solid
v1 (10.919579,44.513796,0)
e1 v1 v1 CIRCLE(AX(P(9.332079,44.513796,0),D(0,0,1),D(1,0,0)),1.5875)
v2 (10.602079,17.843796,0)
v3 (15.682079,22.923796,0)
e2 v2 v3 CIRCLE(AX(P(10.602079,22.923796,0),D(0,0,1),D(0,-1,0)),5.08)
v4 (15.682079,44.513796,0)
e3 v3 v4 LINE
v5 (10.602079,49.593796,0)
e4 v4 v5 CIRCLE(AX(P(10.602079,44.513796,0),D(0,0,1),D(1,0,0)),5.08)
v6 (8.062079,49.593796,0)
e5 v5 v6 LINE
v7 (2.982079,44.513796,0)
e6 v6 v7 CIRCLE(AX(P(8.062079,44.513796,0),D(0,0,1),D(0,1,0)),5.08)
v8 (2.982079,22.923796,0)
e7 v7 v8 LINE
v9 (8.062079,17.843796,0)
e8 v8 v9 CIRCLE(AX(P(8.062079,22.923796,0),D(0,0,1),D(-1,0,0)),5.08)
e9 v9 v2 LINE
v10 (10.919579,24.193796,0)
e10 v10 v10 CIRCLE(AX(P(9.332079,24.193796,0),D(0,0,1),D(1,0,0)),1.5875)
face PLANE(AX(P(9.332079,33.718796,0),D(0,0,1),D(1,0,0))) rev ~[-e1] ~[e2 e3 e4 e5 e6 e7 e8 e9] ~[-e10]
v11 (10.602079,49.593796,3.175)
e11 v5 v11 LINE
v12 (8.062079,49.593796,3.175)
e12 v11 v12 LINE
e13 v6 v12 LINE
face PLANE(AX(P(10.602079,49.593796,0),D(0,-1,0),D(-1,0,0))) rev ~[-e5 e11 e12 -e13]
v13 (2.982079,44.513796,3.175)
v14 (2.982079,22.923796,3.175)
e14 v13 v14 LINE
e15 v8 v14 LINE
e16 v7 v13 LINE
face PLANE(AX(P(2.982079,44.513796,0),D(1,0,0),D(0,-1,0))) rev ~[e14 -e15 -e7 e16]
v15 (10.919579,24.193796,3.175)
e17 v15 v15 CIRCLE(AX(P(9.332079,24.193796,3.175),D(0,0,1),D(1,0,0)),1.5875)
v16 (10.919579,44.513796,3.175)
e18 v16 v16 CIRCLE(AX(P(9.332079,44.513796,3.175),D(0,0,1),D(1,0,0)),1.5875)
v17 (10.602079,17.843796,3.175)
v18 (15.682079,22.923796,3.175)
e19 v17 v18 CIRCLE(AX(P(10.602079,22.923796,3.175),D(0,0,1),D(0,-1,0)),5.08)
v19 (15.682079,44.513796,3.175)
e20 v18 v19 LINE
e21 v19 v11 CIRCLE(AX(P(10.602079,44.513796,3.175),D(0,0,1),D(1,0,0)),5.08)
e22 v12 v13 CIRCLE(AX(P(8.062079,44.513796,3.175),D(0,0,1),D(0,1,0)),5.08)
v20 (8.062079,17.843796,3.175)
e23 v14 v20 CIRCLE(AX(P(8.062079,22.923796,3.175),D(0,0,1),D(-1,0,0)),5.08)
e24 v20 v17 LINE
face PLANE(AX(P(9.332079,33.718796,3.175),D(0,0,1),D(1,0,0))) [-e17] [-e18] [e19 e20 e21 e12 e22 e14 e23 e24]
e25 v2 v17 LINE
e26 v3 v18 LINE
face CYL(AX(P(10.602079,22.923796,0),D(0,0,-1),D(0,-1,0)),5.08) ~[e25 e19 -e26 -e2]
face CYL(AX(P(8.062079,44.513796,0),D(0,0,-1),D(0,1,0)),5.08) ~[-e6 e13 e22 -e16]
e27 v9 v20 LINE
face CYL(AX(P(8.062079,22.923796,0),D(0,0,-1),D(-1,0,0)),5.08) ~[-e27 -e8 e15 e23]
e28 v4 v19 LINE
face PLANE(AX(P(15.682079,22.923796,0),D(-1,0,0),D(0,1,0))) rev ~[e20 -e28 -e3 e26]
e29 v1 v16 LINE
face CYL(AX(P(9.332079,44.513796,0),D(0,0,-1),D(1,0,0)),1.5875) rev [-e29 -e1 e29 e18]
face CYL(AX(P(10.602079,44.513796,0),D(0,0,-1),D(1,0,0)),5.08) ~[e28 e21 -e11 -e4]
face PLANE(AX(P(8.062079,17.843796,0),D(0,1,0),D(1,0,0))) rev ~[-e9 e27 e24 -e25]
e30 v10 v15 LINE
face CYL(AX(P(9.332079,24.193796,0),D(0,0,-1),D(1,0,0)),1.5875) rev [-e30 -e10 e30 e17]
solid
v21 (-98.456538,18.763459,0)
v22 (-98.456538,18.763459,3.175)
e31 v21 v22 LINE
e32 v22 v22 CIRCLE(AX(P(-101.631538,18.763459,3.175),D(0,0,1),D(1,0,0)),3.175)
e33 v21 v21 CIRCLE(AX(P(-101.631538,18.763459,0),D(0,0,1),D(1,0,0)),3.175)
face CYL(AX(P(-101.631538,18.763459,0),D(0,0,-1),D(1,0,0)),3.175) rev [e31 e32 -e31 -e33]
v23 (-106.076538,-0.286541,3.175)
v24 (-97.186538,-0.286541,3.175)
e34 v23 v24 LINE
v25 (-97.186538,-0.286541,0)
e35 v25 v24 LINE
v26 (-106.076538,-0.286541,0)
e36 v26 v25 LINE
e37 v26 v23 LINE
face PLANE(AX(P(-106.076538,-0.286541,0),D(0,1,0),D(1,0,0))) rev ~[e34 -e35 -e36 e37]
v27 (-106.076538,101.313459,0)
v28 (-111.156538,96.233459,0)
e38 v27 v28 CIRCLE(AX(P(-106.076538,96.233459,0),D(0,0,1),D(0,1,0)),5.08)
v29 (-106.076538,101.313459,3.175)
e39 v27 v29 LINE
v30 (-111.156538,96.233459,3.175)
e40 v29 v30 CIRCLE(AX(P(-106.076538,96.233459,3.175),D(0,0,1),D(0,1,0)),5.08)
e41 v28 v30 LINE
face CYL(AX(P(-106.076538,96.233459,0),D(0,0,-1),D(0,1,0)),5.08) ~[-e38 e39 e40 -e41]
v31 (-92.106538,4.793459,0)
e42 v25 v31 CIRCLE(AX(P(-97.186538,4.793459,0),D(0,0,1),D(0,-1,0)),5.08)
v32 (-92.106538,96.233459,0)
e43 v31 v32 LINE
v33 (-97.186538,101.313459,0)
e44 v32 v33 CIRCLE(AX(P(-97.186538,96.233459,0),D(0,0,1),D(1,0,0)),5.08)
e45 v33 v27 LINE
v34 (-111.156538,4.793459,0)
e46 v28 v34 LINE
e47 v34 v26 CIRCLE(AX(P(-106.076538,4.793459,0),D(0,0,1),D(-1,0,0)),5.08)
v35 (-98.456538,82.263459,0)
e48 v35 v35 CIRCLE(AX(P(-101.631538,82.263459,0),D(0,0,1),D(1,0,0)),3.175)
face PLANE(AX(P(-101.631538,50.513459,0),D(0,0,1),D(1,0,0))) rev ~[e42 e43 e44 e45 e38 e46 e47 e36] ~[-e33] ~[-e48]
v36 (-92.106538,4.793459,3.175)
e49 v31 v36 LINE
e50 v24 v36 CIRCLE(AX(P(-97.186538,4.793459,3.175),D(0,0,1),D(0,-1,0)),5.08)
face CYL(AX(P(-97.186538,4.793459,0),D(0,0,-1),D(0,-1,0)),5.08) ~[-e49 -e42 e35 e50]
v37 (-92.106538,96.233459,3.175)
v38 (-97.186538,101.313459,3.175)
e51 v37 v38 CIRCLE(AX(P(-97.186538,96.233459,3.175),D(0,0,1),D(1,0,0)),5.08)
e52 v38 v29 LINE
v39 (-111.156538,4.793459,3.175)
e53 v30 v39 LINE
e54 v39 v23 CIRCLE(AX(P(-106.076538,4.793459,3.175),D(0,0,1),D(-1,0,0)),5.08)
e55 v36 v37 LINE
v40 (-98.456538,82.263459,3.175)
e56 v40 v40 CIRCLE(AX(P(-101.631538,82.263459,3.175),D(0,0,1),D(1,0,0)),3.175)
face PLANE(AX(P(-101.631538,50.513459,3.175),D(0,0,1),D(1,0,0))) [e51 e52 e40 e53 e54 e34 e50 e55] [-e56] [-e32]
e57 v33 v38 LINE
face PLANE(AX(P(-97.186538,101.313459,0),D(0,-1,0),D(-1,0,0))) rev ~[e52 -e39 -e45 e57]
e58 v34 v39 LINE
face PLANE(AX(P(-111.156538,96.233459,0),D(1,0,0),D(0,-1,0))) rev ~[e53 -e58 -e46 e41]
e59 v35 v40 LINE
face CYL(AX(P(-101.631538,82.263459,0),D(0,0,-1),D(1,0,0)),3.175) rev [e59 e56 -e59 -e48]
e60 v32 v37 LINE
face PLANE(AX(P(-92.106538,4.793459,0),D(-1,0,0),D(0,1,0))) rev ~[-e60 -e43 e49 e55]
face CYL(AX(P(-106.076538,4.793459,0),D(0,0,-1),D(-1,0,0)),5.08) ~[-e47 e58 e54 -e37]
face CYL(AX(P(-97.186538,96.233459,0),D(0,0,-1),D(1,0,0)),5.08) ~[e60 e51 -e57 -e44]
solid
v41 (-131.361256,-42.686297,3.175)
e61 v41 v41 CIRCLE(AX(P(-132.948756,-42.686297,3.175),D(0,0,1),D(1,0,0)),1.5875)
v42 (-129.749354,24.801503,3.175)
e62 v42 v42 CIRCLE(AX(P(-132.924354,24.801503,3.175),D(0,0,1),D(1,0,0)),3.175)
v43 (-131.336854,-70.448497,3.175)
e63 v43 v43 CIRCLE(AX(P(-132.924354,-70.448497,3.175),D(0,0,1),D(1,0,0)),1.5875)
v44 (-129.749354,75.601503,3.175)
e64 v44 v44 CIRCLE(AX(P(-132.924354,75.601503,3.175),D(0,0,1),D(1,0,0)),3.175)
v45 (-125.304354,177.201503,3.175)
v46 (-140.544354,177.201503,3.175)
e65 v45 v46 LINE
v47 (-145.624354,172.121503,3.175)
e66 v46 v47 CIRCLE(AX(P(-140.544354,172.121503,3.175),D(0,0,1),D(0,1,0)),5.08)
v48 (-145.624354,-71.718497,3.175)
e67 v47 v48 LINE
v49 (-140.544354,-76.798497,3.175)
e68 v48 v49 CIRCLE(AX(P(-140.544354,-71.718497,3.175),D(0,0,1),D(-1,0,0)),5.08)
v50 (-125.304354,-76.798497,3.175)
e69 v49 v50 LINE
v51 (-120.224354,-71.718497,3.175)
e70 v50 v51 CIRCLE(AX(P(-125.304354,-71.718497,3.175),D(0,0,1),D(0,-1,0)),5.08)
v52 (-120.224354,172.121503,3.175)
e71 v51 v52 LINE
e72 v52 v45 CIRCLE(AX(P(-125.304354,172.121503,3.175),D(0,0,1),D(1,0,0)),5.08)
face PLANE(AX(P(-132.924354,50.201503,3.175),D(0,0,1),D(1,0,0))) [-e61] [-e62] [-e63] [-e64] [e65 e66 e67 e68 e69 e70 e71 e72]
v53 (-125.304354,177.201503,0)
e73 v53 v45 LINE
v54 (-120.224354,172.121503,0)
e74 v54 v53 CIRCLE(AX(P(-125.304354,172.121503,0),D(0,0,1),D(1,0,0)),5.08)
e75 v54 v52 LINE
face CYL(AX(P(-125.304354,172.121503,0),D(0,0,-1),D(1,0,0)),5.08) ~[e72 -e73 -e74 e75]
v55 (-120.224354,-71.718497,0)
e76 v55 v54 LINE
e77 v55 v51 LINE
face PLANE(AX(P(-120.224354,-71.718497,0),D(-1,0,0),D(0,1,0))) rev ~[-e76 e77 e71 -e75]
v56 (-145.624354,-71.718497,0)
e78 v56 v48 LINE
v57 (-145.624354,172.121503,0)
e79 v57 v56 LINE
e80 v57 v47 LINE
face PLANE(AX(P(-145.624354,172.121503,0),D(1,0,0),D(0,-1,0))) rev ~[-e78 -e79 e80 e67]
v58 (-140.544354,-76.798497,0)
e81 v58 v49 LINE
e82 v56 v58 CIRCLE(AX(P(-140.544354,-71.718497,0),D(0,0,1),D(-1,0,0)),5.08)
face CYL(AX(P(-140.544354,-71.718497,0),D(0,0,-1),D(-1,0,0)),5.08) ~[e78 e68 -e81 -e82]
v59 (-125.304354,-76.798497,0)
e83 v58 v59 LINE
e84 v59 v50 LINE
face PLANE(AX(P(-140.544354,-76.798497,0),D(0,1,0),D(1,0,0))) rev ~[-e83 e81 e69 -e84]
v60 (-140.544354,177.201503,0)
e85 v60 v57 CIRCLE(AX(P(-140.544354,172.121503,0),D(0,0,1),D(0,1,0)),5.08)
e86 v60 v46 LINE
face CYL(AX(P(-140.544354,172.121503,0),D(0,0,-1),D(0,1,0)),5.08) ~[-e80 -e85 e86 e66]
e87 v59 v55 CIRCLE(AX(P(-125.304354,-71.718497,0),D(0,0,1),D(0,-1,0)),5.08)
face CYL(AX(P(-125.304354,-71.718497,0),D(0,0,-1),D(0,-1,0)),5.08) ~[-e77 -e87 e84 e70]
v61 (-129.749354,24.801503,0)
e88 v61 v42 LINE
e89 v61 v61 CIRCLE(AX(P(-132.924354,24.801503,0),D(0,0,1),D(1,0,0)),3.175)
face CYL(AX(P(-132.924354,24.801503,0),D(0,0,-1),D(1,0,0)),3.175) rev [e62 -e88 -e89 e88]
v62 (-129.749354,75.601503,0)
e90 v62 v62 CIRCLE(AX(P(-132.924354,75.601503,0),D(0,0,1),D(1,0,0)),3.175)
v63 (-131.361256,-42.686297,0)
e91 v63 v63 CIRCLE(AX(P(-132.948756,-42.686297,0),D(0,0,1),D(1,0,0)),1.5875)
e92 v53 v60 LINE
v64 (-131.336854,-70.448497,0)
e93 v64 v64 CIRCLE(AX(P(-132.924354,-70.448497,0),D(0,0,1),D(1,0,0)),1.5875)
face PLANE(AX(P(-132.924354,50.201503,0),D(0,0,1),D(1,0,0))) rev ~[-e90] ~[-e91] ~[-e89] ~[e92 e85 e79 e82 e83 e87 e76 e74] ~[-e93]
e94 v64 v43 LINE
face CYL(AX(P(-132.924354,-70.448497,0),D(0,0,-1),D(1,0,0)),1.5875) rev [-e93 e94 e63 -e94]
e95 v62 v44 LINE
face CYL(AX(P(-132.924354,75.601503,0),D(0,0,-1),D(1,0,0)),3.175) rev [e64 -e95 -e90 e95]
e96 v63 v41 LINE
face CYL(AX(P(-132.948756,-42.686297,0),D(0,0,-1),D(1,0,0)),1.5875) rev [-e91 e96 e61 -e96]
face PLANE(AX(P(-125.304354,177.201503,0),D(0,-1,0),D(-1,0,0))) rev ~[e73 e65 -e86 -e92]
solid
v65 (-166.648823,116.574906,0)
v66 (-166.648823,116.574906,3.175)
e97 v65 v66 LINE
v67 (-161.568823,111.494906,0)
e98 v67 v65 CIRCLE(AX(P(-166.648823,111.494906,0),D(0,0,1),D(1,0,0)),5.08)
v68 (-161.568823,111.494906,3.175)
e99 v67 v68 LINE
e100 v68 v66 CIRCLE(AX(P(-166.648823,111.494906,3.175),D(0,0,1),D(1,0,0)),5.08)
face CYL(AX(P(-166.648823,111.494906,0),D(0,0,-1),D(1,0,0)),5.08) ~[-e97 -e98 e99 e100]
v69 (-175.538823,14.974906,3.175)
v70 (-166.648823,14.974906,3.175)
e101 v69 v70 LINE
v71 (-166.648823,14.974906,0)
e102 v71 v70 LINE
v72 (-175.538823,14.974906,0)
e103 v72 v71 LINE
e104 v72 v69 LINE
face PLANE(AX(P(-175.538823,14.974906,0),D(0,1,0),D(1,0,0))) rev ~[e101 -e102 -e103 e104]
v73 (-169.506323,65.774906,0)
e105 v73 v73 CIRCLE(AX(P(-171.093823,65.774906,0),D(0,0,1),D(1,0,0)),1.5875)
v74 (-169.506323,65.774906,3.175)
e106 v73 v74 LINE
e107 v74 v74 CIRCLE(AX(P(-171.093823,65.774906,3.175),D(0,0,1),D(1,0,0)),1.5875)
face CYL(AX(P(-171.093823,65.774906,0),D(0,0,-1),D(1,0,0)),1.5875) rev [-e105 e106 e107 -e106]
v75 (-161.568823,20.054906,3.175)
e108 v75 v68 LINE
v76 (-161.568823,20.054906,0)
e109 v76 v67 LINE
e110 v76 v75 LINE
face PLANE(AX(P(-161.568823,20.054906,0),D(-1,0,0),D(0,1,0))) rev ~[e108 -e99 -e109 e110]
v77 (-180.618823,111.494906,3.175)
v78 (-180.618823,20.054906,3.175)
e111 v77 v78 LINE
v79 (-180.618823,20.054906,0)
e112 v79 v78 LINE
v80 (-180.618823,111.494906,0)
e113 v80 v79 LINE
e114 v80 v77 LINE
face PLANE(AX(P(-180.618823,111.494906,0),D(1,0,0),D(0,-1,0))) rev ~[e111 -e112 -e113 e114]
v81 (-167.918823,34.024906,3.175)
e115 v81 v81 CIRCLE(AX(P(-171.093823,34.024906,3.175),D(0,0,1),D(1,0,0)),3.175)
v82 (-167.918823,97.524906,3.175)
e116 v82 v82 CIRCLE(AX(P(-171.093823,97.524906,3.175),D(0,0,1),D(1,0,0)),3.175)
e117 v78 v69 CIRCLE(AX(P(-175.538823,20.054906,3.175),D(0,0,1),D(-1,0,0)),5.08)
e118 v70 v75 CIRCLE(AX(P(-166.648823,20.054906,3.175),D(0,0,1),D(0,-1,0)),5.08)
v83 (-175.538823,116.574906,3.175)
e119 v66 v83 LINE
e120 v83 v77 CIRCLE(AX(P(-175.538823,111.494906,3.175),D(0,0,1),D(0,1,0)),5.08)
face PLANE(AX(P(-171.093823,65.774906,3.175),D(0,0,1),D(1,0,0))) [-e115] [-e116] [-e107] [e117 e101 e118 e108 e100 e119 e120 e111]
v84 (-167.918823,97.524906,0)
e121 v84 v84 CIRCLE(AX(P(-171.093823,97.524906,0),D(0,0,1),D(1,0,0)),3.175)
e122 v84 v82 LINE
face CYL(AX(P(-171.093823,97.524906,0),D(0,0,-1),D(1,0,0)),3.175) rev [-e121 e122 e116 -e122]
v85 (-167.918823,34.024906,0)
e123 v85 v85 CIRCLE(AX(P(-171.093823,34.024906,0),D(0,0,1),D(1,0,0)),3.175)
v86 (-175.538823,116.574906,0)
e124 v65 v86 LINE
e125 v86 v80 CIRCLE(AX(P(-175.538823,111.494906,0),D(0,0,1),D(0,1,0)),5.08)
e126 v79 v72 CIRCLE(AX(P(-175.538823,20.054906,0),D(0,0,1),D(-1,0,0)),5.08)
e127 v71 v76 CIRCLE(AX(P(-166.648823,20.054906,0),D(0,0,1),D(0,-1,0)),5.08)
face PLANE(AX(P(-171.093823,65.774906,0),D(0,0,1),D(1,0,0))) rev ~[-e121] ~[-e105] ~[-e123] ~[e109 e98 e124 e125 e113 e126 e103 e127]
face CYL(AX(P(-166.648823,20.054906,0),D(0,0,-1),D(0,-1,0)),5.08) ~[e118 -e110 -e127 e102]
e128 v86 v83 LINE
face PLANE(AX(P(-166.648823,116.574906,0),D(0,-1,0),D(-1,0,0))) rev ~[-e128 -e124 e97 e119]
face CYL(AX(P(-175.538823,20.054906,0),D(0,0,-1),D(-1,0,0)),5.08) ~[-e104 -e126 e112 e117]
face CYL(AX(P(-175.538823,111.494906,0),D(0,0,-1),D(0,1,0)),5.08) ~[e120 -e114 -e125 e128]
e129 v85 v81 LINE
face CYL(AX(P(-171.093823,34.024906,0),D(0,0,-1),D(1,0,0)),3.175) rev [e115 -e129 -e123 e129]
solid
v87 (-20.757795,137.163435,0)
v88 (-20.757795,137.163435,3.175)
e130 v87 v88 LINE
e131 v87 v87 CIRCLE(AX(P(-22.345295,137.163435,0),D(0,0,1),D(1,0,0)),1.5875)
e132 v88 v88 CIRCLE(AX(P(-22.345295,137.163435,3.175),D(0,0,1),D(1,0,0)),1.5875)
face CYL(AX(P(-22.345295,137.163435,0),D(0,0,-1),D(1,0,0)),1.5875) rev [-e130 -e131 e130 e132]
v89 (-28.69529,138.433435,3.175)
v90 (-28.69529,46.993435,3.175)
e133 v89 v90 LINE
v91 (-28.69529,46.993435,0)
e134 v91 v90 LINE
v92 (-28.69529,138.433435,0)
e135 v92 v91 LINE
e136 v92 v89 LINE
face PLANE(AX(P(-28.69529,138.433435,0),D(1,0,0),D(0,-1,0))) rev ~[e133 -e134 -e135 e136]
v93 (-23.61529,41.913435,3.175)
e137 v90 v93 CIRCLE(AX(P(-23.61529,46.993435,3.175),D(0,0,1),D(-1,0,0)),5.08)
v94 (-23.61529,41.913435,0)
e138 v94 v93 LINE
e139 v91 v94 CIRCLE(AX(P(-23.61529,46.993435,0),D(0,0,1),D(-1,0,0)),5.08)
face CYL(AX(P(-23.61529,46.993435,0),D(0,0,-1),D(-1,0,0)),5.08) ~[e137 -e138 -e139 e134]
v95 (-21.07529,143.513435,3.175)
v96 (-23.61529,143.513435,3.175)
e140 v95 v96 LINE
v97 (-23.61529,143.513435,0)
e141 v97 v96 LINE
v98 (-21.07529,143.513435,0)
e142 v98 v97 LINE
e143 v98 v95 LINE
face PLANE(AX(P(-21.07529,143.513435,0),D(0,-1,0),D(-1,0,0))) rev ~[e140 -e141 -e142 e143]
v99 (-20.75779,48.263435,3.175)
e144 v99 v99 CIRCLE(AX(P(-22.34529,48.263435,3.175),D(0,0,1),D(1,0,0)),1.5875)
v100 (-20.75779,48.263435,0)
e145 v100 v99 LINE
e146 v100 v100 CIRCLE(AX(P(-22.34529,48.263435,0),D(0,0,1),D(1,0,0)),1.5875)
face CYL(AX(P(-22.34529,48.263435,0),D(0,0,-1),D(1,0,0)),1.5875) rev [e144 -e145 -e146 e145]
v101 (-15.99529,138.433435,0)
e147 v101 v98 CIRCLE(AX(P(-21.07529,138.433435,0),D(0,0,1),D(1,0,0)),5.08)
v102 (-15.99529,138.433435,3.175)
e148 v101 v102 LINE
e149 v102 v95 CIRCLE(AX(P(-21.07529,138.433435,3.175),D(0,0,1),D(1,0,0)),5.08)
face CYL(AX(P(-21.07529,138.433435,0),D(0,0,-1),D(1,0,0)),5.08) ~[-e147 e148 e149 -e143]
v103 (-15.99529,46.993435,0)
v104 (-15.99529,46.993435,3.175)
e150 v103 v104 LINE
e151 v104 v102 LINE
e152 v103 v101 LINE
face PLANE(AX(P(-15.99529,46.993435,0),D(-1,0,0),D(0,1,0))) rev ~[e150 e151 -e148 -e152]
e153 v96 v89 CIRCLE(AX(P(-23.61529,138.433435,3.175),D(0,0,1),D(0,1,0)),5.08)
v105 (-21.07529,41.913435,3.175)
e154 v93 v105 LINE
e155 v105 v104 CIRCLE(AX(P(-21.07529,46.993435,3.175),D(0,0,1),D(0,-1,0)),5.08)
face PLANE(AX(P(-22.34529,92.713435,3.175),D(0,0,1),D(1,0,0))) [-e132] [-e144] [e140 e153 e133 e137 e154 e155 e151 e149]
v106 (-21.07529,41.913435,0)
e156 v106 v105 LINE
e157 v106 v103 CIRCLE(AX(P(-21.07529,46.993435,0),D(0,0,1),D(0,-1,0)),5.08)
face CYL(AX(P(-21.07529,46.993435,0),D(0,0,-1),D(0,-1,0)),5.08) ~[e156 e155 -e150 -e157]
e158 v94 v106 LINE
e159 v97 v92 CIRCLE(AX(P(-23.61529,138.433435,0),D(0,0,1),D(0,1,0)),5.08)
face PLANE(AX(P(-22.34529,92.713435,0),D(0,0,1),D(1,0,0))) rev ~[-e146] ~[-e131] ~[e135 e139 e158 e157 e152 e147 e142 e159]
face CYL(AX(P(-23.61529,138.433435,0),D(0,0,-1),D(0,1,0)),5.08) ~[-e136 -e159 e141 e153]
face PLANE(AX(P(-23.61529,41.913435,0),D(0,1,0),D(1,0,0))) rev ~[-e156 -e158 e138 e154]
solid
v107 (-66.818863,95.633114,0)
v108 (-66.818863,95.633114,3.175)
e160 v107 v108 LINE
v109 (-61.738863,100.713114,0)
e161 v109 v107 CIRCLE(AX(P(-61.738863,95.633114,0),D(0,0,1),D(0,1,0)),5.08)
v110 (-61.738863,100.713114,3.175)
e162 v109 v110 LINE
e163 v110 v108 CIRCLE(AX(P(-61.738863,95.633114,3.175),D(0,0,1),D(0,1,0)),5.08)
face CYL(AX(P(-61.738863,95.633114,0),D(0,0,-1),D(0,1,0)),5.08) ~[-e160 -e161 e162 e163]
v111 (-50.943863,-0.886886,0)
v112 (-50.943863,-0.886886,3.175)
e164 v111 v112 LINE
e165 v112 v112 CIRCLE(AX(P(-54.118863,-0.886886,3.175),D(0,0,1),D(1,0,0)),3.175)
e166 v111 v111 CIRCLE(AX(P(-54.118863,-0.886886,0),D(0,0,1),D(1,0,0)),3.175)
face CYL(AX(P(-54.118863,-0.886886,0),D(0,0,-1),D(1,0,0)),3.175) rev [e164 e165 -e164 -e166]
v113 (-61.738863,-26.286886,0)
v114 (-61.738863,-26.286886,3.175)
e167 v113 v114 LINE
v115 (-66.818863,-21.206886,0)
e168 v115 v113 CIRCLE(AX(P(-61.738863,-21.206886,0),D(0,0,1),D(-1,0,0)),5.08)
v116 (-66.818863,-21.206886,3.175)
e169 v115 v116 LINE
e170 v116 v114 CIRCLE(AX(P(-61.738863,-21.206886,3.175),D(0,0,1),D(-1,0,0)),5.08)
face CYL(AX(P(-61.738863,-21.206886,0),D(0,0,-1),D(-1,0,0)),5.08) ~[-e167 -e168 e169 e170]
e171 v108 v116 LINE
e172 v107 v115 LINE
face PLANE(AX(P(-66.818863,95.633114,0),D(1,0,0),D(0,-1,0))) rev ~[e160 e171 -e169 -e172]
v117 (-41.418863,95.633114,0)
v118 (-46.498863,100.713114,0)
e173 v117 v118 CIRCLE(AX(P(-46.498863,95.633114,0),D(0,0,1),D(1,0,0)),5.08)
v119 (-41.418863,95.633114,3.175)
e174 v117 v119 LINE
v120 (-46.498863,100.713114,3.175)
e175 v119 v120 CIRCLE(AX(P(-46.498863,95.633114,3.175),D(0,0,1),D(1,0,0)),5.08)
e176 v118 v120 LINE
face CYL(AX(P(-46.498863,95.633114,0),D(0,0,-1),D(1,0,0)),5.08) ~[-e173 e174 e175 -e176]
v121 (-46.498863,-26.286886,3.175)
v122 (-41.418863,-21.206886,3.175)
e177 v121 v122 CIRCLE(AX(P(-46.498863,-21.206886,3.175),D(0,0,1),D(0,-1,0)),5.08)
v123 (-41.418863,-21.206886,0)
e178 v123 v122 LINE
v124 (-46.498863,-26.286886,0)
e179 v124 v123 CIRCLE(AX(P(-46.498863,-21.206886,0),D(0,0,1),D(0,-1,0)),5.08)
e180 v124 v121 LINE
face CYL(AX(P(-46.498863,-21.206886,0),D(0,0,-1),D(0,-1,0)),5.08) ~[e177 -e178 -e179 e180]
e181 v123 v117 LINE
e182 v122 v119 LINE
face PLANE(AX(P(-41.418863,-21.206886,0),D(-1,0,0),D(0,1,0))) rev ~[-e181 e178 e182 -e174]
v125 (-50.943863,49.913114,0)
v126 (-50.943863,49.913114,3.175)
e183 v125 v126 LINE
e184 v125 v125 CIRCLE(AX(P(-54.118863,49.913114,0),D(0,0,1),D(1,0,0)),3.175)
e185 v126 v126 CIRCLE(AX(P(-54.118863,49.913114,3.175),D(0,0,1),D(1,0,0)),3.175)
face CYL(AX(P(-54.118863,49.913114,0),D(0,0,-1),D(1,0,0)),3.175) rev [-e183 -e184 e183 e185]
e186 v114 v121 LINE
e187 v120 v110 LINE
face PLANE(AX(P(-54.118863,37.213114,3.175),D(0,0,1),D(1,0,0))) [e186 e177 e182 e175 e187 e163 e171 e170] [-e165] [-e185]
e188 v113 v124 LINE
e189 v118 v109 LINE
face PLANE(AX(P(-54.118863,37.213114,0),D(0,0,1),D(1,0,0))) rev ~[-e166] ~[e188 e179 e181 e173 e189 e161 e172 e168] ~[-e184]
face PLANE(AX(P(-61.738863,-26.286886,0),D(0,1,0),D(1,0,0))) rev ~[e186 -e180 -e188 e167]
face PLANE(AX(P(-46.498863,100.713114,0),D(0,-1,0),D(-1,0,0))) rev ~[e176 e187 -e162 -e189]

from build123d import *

# Parameters (mm, degrees)
F0_R      = 1.5875
F0_R_2    = 3.175
F6_DEPTH  = 3.175
F2_R      = 3.175
F7_DEPTH  = 3.175
F1_R      = 3.175
F8_DEPTH  = 3.175
F3_R      = 1.5875
F9_DEPTH  = 3.175
F4_R      = 3.175
F4_R_2    = 1.5875
F10_DEPTH = 3.175
F5_R      = 1.5875
F11_DEPTH = 3.175


# Not quite as in the source:
# - a length typed as a fraction of an inch, garbled in the dataset ("3 / 203.2 mm" for 3/8 in), is restored
# - a feature names something its author has since deleted; it is built from what else it names


with BuildPart() as f6:
    # F0 (on Top) → F6 (new body)
    with BuildSketch(Plane.XY):
        with BuildLine():
            Line((-125.3043544817, 177.201503253), (-140.5443544817, 177.201503253))
            ThreePointArc((-140.5443544817, 177.201503253), (-144.1364569301, 175.7136057014), (-145.6243544817, 172.121503253))
            Line((-145.6243544817, 172.121503253), (-145.6243544817, -71.718496747))
            ThreePointArc((-145.6243544817, -71.718496747), (-144.1364569301, -75.3105991954), (-140.5443544817, -76.798496747))
            Line((-140.5443544817, -76.798496747), (-125.3043544817, -76.798496747))
            ThreePointArc((-125.3043544817, -76.798496747), (-121.7122520333, -75.3105991954), (-120.2243544817, -71.718496747))
            Line((-120.2243544817, -71.718496747), (-120.2243544817, 172.121503253))
            ThreePointArc((-120.2243544817, 172.121503253), (-121.7122520333, 175.7136057014), (-125.3043544817, 177.201503253))
        make_face()
        with Locations((-132.9243544817, -70.448496747)):
            Circle(F0_R, mode=Mode.SUBTRACT)
        with Locations((-132.948756218, -42.686296747)):
            Circle(F0_R, mode=Mode.SUBTRACT)
        with Locations((-132.9243544817, 24.801503253)):
            Circle(F0_R_2, mode=Mode.SUBTRACT)
        with Locations((-132.9243544817, 75.601503253)):
            Circle(F0_R_2, mode=Mode.SUBTRACT)
    extrude(amount=F6_DEPTH)


with BuildPart() as f7:
    # F2 (on Top) → F7 (new body)
    with BuildSketch(Plane.XY):
        with BuildLine():
            Line((-97.1865381289, 101.3134590626), (-106.0765381289, 101.3134590626))
            ThreePointArc((-106.0765381289, 101.3134590626), (-109.6686405773, 99.825561511), (-111.1565381289, 96.2334590626))
            Line((-111.1565381289, 96.2334590626), (-111.1565381289, 4.7934590626))
            ThreePointArc((-111.1565381289, 4.7934590626), (-109.6686405773, 1.2013566141), (-106.0765381289, -0.2865409374))
            Line((-106.0765381289, -0.2865409374), (-97.1865381289, -0.2865409374))
            ThreePointArc((-97.1865381289, -0.2865409374), (-93.5944356804, 1.2013566141), (-92.1065381289, 4.7934590626))
            Line((-92.1065381289, 4.7934590626), (-92.1065381289, 96.2334590626))
            ThreePointArc((-92.1065381289, 96.2334590626), (-93.5944356804, 99.825561511), (-97.1865381289, 101.3134590626))
        make_face()
        with Locations((-101.6315381289, 18.7634590626)):
            Circle(F2_R, mode=Mode.SUBTRACT)
        with Locations((-101.6315381289, 82.2634590626)):
            Circle(F2_R, mode=Mode.SUBTRACT)
    extrude(amount=F7_DEPTH)


with BuildPart() as f8:
    # F1 (on Top) → F8 (new body)
    with BuildSketch(Plane.XY):
        with BuildLine():
            Line((-46.4988631535, 100.7131136298), (-61.7388631535, 100.7131136298))
            ThreePointArc((-61.7388631535, 100.7131136298), (-65.3309656019, 99.2252160782), (-66.8188631535, 95.6331136298))
            Line((-66.8188631535, 95.6331136298), (-66.8188631535, -21.2068863702))
            ThreePointArc((-66.8188631535, -21.2068863702), (-65.3309656019, -24.7989888186), (-61.7388631535, -26.2868863702))
            Line((-61.7388631535, -26.2868863702), (-46.4988631535, -26.2868863702))
            ThreePointArc((-46.4988631535, -26.2868863702), (-42.906760705, -24.7989888186), (-41.4188631535, -21.2068863702))
            Line((-41.4188631535, -21.2068863702), (-41.4188631535, 95.6331136298))
            ThreePointArc((-41.4188631535, 95.6331136298), (-42.906760705, 99.2252160782), (-46.4988631535, 100.7131136298))
        make_face()
        with Locations((-54.1188631535, -0.8868863702)):
            Circle(F1_R, mode=Mode.SUBTRACT)
        with Locations((-54.1188631535, 49.9131136298)):
            Circle(F1_R, mode=Mode.SUBTRACT)
    extrude(amount=F8_DEPTH)


with BuildPart() as f9:
    # F3 (on Top) → F9 (new body)
    with BuildSketch(Plane.XY):
        with BuildLine():
            Line((-21.075289588, 143.5134345447), (-23.615289588, 143.5134345447))
            ThreePointArc((-23.615289588, 143.5134345447), (-27.2073920364, 142.0255369931), (-28.695289588, 138.4334345447))
            Line((-28.695289588, 138.4334345447), (-28.695289588, 46.9934345447))
            ThreePointArc((-28.695289588, 46.9934345447), (-27.2073920364, 43.4013320963), (-23.615289588, 41.9134345447))
            Line((-23.615289588, 41.9134345447), (-21.075289588, 41.9134345447))
            ThreePointArc((-21.075289588, 41.9134345447), (-17.4831871395, 43.4013320963), (-15.995289588, 46.9934345447))
            Line((-15.995289588, 46.9934345447), (-15.995289588, 138.4334345447))
            ThreePointArc((-15.995289588, 138.4334345447), (-17.4831871395, 142.0255369931), (-21.075289588, 143.5134345447))
        make_face()
        with Locations((-22.345289588, 48.2634345447)):
            Circle(F3_R, mode=Mode.SUBTRACT)
        with Locations((-22.3452951759, 137.1634345447)):
            Circle(F3_R, mode=Mode.SUBTRACT)
    extrude(amount=F9_DEPTH)


with BuildPart() as f10:
    # F4 (on Top) → F10 (new body)
    with BuildSketch(Plane.XY):
        with BuildLine():
            Line((-166.6488225746, 116.5749058127), (-175.5388225746, 116.5749058127))
            ThreePointArc((-175.5388225746, 116.5749058127), (-179.130925023, 115.0870082612), (-180.6188225746, 111.4949058127))
            Line((-180.6188225746, 111.4949058127), (-180.6188225746, 20.0549058127))
            ThreePointArc((-180.6188225746, 20.0549058127), (-179.130925023, 16.4628033643), (-175.5388225746, 14.9749058127))
            Line((-175.5388225746, 14.9749058127), (-166.6488225746, 14.9749058127))
            ThreePointArc((-166.6488225746, 14.9749058127), (-163.0567201262, 16.4628033643), (-161.5688225746, 20.0549058127))
            Line((-161.5688225746, 20.0549058127), (-161.5688225746, 111.4949058127))
            ThreePointArc((-161.5688225746, 111.4949058127), (-163.0567201262, 115.0870082612), (-166.6488225746, 116.5749058127))
        make_face()
        with Locations((-171.0938225746, 34.0249058127)):
            Circle(F4_R, mode=Mode.SUBTRACT)
        with Locations((-171.0938225746, 65.7749058127)):
            Circle(F4_R_2, mode=Mode.SUBTRACT)
        with Locations((-171.0938225746, 97.5249058127)):
            Circle(F4_R, mode=Mode.SUBTRACT)
    extrude(amount=F10_DEPTH)


with BuildPart() as f11:
    # F5 (on Top) → F11 (new body)
    with BuildSketch(Plane.XY):
        with BuildLine():
            Line((10.6020793927, 49.5937959403), (8.0620793927, 49.5937959403))
            ThreePointArc((8.0620793927, 49.5937959403), (4.4699769443, 48.1058983887), (2.9820793927, 44.5137959403))
            Line((2.9820793927, 44.5137959403), (2.9820793927, 22.9237959403))
            ThreePointArc((2.9820793927, 22.9237959403), (4.4699769443, 19.3316934919), (8.0620793927, 17.8437959403))
            Line((8.0620793927, 17.8437959403), (10.6020793927, 17.8437959403))
            ThreePointArc((10.6020793927, 17.8437959403), (14.1941818412, 19.3316934919), (15.6820793927, 22.9237959403))
            Line((15.6820793927, 22.9237959403), (15.6820793927, 44.5137959403))
            ThreePointArc((15.6820793927, 44.5137959403), (14.1941818412, 48.1058983887), (10.6020793927, 49.5937959403))
        make_face()
        with Locations((9.3320793927, 24.1937959403)):
            Circle(F5_R, mode=Mode.SUBTRACT)
        with Locations((9.3320793927, 44.5137959403)):
            Circle(F5_R, mode=Mode.SUBTRACT)
    extrude(amount=F11_DEPTH)


solid = Compound([f6.part, f7.part, f8.part, f9.part, f10.part, f11.part])
